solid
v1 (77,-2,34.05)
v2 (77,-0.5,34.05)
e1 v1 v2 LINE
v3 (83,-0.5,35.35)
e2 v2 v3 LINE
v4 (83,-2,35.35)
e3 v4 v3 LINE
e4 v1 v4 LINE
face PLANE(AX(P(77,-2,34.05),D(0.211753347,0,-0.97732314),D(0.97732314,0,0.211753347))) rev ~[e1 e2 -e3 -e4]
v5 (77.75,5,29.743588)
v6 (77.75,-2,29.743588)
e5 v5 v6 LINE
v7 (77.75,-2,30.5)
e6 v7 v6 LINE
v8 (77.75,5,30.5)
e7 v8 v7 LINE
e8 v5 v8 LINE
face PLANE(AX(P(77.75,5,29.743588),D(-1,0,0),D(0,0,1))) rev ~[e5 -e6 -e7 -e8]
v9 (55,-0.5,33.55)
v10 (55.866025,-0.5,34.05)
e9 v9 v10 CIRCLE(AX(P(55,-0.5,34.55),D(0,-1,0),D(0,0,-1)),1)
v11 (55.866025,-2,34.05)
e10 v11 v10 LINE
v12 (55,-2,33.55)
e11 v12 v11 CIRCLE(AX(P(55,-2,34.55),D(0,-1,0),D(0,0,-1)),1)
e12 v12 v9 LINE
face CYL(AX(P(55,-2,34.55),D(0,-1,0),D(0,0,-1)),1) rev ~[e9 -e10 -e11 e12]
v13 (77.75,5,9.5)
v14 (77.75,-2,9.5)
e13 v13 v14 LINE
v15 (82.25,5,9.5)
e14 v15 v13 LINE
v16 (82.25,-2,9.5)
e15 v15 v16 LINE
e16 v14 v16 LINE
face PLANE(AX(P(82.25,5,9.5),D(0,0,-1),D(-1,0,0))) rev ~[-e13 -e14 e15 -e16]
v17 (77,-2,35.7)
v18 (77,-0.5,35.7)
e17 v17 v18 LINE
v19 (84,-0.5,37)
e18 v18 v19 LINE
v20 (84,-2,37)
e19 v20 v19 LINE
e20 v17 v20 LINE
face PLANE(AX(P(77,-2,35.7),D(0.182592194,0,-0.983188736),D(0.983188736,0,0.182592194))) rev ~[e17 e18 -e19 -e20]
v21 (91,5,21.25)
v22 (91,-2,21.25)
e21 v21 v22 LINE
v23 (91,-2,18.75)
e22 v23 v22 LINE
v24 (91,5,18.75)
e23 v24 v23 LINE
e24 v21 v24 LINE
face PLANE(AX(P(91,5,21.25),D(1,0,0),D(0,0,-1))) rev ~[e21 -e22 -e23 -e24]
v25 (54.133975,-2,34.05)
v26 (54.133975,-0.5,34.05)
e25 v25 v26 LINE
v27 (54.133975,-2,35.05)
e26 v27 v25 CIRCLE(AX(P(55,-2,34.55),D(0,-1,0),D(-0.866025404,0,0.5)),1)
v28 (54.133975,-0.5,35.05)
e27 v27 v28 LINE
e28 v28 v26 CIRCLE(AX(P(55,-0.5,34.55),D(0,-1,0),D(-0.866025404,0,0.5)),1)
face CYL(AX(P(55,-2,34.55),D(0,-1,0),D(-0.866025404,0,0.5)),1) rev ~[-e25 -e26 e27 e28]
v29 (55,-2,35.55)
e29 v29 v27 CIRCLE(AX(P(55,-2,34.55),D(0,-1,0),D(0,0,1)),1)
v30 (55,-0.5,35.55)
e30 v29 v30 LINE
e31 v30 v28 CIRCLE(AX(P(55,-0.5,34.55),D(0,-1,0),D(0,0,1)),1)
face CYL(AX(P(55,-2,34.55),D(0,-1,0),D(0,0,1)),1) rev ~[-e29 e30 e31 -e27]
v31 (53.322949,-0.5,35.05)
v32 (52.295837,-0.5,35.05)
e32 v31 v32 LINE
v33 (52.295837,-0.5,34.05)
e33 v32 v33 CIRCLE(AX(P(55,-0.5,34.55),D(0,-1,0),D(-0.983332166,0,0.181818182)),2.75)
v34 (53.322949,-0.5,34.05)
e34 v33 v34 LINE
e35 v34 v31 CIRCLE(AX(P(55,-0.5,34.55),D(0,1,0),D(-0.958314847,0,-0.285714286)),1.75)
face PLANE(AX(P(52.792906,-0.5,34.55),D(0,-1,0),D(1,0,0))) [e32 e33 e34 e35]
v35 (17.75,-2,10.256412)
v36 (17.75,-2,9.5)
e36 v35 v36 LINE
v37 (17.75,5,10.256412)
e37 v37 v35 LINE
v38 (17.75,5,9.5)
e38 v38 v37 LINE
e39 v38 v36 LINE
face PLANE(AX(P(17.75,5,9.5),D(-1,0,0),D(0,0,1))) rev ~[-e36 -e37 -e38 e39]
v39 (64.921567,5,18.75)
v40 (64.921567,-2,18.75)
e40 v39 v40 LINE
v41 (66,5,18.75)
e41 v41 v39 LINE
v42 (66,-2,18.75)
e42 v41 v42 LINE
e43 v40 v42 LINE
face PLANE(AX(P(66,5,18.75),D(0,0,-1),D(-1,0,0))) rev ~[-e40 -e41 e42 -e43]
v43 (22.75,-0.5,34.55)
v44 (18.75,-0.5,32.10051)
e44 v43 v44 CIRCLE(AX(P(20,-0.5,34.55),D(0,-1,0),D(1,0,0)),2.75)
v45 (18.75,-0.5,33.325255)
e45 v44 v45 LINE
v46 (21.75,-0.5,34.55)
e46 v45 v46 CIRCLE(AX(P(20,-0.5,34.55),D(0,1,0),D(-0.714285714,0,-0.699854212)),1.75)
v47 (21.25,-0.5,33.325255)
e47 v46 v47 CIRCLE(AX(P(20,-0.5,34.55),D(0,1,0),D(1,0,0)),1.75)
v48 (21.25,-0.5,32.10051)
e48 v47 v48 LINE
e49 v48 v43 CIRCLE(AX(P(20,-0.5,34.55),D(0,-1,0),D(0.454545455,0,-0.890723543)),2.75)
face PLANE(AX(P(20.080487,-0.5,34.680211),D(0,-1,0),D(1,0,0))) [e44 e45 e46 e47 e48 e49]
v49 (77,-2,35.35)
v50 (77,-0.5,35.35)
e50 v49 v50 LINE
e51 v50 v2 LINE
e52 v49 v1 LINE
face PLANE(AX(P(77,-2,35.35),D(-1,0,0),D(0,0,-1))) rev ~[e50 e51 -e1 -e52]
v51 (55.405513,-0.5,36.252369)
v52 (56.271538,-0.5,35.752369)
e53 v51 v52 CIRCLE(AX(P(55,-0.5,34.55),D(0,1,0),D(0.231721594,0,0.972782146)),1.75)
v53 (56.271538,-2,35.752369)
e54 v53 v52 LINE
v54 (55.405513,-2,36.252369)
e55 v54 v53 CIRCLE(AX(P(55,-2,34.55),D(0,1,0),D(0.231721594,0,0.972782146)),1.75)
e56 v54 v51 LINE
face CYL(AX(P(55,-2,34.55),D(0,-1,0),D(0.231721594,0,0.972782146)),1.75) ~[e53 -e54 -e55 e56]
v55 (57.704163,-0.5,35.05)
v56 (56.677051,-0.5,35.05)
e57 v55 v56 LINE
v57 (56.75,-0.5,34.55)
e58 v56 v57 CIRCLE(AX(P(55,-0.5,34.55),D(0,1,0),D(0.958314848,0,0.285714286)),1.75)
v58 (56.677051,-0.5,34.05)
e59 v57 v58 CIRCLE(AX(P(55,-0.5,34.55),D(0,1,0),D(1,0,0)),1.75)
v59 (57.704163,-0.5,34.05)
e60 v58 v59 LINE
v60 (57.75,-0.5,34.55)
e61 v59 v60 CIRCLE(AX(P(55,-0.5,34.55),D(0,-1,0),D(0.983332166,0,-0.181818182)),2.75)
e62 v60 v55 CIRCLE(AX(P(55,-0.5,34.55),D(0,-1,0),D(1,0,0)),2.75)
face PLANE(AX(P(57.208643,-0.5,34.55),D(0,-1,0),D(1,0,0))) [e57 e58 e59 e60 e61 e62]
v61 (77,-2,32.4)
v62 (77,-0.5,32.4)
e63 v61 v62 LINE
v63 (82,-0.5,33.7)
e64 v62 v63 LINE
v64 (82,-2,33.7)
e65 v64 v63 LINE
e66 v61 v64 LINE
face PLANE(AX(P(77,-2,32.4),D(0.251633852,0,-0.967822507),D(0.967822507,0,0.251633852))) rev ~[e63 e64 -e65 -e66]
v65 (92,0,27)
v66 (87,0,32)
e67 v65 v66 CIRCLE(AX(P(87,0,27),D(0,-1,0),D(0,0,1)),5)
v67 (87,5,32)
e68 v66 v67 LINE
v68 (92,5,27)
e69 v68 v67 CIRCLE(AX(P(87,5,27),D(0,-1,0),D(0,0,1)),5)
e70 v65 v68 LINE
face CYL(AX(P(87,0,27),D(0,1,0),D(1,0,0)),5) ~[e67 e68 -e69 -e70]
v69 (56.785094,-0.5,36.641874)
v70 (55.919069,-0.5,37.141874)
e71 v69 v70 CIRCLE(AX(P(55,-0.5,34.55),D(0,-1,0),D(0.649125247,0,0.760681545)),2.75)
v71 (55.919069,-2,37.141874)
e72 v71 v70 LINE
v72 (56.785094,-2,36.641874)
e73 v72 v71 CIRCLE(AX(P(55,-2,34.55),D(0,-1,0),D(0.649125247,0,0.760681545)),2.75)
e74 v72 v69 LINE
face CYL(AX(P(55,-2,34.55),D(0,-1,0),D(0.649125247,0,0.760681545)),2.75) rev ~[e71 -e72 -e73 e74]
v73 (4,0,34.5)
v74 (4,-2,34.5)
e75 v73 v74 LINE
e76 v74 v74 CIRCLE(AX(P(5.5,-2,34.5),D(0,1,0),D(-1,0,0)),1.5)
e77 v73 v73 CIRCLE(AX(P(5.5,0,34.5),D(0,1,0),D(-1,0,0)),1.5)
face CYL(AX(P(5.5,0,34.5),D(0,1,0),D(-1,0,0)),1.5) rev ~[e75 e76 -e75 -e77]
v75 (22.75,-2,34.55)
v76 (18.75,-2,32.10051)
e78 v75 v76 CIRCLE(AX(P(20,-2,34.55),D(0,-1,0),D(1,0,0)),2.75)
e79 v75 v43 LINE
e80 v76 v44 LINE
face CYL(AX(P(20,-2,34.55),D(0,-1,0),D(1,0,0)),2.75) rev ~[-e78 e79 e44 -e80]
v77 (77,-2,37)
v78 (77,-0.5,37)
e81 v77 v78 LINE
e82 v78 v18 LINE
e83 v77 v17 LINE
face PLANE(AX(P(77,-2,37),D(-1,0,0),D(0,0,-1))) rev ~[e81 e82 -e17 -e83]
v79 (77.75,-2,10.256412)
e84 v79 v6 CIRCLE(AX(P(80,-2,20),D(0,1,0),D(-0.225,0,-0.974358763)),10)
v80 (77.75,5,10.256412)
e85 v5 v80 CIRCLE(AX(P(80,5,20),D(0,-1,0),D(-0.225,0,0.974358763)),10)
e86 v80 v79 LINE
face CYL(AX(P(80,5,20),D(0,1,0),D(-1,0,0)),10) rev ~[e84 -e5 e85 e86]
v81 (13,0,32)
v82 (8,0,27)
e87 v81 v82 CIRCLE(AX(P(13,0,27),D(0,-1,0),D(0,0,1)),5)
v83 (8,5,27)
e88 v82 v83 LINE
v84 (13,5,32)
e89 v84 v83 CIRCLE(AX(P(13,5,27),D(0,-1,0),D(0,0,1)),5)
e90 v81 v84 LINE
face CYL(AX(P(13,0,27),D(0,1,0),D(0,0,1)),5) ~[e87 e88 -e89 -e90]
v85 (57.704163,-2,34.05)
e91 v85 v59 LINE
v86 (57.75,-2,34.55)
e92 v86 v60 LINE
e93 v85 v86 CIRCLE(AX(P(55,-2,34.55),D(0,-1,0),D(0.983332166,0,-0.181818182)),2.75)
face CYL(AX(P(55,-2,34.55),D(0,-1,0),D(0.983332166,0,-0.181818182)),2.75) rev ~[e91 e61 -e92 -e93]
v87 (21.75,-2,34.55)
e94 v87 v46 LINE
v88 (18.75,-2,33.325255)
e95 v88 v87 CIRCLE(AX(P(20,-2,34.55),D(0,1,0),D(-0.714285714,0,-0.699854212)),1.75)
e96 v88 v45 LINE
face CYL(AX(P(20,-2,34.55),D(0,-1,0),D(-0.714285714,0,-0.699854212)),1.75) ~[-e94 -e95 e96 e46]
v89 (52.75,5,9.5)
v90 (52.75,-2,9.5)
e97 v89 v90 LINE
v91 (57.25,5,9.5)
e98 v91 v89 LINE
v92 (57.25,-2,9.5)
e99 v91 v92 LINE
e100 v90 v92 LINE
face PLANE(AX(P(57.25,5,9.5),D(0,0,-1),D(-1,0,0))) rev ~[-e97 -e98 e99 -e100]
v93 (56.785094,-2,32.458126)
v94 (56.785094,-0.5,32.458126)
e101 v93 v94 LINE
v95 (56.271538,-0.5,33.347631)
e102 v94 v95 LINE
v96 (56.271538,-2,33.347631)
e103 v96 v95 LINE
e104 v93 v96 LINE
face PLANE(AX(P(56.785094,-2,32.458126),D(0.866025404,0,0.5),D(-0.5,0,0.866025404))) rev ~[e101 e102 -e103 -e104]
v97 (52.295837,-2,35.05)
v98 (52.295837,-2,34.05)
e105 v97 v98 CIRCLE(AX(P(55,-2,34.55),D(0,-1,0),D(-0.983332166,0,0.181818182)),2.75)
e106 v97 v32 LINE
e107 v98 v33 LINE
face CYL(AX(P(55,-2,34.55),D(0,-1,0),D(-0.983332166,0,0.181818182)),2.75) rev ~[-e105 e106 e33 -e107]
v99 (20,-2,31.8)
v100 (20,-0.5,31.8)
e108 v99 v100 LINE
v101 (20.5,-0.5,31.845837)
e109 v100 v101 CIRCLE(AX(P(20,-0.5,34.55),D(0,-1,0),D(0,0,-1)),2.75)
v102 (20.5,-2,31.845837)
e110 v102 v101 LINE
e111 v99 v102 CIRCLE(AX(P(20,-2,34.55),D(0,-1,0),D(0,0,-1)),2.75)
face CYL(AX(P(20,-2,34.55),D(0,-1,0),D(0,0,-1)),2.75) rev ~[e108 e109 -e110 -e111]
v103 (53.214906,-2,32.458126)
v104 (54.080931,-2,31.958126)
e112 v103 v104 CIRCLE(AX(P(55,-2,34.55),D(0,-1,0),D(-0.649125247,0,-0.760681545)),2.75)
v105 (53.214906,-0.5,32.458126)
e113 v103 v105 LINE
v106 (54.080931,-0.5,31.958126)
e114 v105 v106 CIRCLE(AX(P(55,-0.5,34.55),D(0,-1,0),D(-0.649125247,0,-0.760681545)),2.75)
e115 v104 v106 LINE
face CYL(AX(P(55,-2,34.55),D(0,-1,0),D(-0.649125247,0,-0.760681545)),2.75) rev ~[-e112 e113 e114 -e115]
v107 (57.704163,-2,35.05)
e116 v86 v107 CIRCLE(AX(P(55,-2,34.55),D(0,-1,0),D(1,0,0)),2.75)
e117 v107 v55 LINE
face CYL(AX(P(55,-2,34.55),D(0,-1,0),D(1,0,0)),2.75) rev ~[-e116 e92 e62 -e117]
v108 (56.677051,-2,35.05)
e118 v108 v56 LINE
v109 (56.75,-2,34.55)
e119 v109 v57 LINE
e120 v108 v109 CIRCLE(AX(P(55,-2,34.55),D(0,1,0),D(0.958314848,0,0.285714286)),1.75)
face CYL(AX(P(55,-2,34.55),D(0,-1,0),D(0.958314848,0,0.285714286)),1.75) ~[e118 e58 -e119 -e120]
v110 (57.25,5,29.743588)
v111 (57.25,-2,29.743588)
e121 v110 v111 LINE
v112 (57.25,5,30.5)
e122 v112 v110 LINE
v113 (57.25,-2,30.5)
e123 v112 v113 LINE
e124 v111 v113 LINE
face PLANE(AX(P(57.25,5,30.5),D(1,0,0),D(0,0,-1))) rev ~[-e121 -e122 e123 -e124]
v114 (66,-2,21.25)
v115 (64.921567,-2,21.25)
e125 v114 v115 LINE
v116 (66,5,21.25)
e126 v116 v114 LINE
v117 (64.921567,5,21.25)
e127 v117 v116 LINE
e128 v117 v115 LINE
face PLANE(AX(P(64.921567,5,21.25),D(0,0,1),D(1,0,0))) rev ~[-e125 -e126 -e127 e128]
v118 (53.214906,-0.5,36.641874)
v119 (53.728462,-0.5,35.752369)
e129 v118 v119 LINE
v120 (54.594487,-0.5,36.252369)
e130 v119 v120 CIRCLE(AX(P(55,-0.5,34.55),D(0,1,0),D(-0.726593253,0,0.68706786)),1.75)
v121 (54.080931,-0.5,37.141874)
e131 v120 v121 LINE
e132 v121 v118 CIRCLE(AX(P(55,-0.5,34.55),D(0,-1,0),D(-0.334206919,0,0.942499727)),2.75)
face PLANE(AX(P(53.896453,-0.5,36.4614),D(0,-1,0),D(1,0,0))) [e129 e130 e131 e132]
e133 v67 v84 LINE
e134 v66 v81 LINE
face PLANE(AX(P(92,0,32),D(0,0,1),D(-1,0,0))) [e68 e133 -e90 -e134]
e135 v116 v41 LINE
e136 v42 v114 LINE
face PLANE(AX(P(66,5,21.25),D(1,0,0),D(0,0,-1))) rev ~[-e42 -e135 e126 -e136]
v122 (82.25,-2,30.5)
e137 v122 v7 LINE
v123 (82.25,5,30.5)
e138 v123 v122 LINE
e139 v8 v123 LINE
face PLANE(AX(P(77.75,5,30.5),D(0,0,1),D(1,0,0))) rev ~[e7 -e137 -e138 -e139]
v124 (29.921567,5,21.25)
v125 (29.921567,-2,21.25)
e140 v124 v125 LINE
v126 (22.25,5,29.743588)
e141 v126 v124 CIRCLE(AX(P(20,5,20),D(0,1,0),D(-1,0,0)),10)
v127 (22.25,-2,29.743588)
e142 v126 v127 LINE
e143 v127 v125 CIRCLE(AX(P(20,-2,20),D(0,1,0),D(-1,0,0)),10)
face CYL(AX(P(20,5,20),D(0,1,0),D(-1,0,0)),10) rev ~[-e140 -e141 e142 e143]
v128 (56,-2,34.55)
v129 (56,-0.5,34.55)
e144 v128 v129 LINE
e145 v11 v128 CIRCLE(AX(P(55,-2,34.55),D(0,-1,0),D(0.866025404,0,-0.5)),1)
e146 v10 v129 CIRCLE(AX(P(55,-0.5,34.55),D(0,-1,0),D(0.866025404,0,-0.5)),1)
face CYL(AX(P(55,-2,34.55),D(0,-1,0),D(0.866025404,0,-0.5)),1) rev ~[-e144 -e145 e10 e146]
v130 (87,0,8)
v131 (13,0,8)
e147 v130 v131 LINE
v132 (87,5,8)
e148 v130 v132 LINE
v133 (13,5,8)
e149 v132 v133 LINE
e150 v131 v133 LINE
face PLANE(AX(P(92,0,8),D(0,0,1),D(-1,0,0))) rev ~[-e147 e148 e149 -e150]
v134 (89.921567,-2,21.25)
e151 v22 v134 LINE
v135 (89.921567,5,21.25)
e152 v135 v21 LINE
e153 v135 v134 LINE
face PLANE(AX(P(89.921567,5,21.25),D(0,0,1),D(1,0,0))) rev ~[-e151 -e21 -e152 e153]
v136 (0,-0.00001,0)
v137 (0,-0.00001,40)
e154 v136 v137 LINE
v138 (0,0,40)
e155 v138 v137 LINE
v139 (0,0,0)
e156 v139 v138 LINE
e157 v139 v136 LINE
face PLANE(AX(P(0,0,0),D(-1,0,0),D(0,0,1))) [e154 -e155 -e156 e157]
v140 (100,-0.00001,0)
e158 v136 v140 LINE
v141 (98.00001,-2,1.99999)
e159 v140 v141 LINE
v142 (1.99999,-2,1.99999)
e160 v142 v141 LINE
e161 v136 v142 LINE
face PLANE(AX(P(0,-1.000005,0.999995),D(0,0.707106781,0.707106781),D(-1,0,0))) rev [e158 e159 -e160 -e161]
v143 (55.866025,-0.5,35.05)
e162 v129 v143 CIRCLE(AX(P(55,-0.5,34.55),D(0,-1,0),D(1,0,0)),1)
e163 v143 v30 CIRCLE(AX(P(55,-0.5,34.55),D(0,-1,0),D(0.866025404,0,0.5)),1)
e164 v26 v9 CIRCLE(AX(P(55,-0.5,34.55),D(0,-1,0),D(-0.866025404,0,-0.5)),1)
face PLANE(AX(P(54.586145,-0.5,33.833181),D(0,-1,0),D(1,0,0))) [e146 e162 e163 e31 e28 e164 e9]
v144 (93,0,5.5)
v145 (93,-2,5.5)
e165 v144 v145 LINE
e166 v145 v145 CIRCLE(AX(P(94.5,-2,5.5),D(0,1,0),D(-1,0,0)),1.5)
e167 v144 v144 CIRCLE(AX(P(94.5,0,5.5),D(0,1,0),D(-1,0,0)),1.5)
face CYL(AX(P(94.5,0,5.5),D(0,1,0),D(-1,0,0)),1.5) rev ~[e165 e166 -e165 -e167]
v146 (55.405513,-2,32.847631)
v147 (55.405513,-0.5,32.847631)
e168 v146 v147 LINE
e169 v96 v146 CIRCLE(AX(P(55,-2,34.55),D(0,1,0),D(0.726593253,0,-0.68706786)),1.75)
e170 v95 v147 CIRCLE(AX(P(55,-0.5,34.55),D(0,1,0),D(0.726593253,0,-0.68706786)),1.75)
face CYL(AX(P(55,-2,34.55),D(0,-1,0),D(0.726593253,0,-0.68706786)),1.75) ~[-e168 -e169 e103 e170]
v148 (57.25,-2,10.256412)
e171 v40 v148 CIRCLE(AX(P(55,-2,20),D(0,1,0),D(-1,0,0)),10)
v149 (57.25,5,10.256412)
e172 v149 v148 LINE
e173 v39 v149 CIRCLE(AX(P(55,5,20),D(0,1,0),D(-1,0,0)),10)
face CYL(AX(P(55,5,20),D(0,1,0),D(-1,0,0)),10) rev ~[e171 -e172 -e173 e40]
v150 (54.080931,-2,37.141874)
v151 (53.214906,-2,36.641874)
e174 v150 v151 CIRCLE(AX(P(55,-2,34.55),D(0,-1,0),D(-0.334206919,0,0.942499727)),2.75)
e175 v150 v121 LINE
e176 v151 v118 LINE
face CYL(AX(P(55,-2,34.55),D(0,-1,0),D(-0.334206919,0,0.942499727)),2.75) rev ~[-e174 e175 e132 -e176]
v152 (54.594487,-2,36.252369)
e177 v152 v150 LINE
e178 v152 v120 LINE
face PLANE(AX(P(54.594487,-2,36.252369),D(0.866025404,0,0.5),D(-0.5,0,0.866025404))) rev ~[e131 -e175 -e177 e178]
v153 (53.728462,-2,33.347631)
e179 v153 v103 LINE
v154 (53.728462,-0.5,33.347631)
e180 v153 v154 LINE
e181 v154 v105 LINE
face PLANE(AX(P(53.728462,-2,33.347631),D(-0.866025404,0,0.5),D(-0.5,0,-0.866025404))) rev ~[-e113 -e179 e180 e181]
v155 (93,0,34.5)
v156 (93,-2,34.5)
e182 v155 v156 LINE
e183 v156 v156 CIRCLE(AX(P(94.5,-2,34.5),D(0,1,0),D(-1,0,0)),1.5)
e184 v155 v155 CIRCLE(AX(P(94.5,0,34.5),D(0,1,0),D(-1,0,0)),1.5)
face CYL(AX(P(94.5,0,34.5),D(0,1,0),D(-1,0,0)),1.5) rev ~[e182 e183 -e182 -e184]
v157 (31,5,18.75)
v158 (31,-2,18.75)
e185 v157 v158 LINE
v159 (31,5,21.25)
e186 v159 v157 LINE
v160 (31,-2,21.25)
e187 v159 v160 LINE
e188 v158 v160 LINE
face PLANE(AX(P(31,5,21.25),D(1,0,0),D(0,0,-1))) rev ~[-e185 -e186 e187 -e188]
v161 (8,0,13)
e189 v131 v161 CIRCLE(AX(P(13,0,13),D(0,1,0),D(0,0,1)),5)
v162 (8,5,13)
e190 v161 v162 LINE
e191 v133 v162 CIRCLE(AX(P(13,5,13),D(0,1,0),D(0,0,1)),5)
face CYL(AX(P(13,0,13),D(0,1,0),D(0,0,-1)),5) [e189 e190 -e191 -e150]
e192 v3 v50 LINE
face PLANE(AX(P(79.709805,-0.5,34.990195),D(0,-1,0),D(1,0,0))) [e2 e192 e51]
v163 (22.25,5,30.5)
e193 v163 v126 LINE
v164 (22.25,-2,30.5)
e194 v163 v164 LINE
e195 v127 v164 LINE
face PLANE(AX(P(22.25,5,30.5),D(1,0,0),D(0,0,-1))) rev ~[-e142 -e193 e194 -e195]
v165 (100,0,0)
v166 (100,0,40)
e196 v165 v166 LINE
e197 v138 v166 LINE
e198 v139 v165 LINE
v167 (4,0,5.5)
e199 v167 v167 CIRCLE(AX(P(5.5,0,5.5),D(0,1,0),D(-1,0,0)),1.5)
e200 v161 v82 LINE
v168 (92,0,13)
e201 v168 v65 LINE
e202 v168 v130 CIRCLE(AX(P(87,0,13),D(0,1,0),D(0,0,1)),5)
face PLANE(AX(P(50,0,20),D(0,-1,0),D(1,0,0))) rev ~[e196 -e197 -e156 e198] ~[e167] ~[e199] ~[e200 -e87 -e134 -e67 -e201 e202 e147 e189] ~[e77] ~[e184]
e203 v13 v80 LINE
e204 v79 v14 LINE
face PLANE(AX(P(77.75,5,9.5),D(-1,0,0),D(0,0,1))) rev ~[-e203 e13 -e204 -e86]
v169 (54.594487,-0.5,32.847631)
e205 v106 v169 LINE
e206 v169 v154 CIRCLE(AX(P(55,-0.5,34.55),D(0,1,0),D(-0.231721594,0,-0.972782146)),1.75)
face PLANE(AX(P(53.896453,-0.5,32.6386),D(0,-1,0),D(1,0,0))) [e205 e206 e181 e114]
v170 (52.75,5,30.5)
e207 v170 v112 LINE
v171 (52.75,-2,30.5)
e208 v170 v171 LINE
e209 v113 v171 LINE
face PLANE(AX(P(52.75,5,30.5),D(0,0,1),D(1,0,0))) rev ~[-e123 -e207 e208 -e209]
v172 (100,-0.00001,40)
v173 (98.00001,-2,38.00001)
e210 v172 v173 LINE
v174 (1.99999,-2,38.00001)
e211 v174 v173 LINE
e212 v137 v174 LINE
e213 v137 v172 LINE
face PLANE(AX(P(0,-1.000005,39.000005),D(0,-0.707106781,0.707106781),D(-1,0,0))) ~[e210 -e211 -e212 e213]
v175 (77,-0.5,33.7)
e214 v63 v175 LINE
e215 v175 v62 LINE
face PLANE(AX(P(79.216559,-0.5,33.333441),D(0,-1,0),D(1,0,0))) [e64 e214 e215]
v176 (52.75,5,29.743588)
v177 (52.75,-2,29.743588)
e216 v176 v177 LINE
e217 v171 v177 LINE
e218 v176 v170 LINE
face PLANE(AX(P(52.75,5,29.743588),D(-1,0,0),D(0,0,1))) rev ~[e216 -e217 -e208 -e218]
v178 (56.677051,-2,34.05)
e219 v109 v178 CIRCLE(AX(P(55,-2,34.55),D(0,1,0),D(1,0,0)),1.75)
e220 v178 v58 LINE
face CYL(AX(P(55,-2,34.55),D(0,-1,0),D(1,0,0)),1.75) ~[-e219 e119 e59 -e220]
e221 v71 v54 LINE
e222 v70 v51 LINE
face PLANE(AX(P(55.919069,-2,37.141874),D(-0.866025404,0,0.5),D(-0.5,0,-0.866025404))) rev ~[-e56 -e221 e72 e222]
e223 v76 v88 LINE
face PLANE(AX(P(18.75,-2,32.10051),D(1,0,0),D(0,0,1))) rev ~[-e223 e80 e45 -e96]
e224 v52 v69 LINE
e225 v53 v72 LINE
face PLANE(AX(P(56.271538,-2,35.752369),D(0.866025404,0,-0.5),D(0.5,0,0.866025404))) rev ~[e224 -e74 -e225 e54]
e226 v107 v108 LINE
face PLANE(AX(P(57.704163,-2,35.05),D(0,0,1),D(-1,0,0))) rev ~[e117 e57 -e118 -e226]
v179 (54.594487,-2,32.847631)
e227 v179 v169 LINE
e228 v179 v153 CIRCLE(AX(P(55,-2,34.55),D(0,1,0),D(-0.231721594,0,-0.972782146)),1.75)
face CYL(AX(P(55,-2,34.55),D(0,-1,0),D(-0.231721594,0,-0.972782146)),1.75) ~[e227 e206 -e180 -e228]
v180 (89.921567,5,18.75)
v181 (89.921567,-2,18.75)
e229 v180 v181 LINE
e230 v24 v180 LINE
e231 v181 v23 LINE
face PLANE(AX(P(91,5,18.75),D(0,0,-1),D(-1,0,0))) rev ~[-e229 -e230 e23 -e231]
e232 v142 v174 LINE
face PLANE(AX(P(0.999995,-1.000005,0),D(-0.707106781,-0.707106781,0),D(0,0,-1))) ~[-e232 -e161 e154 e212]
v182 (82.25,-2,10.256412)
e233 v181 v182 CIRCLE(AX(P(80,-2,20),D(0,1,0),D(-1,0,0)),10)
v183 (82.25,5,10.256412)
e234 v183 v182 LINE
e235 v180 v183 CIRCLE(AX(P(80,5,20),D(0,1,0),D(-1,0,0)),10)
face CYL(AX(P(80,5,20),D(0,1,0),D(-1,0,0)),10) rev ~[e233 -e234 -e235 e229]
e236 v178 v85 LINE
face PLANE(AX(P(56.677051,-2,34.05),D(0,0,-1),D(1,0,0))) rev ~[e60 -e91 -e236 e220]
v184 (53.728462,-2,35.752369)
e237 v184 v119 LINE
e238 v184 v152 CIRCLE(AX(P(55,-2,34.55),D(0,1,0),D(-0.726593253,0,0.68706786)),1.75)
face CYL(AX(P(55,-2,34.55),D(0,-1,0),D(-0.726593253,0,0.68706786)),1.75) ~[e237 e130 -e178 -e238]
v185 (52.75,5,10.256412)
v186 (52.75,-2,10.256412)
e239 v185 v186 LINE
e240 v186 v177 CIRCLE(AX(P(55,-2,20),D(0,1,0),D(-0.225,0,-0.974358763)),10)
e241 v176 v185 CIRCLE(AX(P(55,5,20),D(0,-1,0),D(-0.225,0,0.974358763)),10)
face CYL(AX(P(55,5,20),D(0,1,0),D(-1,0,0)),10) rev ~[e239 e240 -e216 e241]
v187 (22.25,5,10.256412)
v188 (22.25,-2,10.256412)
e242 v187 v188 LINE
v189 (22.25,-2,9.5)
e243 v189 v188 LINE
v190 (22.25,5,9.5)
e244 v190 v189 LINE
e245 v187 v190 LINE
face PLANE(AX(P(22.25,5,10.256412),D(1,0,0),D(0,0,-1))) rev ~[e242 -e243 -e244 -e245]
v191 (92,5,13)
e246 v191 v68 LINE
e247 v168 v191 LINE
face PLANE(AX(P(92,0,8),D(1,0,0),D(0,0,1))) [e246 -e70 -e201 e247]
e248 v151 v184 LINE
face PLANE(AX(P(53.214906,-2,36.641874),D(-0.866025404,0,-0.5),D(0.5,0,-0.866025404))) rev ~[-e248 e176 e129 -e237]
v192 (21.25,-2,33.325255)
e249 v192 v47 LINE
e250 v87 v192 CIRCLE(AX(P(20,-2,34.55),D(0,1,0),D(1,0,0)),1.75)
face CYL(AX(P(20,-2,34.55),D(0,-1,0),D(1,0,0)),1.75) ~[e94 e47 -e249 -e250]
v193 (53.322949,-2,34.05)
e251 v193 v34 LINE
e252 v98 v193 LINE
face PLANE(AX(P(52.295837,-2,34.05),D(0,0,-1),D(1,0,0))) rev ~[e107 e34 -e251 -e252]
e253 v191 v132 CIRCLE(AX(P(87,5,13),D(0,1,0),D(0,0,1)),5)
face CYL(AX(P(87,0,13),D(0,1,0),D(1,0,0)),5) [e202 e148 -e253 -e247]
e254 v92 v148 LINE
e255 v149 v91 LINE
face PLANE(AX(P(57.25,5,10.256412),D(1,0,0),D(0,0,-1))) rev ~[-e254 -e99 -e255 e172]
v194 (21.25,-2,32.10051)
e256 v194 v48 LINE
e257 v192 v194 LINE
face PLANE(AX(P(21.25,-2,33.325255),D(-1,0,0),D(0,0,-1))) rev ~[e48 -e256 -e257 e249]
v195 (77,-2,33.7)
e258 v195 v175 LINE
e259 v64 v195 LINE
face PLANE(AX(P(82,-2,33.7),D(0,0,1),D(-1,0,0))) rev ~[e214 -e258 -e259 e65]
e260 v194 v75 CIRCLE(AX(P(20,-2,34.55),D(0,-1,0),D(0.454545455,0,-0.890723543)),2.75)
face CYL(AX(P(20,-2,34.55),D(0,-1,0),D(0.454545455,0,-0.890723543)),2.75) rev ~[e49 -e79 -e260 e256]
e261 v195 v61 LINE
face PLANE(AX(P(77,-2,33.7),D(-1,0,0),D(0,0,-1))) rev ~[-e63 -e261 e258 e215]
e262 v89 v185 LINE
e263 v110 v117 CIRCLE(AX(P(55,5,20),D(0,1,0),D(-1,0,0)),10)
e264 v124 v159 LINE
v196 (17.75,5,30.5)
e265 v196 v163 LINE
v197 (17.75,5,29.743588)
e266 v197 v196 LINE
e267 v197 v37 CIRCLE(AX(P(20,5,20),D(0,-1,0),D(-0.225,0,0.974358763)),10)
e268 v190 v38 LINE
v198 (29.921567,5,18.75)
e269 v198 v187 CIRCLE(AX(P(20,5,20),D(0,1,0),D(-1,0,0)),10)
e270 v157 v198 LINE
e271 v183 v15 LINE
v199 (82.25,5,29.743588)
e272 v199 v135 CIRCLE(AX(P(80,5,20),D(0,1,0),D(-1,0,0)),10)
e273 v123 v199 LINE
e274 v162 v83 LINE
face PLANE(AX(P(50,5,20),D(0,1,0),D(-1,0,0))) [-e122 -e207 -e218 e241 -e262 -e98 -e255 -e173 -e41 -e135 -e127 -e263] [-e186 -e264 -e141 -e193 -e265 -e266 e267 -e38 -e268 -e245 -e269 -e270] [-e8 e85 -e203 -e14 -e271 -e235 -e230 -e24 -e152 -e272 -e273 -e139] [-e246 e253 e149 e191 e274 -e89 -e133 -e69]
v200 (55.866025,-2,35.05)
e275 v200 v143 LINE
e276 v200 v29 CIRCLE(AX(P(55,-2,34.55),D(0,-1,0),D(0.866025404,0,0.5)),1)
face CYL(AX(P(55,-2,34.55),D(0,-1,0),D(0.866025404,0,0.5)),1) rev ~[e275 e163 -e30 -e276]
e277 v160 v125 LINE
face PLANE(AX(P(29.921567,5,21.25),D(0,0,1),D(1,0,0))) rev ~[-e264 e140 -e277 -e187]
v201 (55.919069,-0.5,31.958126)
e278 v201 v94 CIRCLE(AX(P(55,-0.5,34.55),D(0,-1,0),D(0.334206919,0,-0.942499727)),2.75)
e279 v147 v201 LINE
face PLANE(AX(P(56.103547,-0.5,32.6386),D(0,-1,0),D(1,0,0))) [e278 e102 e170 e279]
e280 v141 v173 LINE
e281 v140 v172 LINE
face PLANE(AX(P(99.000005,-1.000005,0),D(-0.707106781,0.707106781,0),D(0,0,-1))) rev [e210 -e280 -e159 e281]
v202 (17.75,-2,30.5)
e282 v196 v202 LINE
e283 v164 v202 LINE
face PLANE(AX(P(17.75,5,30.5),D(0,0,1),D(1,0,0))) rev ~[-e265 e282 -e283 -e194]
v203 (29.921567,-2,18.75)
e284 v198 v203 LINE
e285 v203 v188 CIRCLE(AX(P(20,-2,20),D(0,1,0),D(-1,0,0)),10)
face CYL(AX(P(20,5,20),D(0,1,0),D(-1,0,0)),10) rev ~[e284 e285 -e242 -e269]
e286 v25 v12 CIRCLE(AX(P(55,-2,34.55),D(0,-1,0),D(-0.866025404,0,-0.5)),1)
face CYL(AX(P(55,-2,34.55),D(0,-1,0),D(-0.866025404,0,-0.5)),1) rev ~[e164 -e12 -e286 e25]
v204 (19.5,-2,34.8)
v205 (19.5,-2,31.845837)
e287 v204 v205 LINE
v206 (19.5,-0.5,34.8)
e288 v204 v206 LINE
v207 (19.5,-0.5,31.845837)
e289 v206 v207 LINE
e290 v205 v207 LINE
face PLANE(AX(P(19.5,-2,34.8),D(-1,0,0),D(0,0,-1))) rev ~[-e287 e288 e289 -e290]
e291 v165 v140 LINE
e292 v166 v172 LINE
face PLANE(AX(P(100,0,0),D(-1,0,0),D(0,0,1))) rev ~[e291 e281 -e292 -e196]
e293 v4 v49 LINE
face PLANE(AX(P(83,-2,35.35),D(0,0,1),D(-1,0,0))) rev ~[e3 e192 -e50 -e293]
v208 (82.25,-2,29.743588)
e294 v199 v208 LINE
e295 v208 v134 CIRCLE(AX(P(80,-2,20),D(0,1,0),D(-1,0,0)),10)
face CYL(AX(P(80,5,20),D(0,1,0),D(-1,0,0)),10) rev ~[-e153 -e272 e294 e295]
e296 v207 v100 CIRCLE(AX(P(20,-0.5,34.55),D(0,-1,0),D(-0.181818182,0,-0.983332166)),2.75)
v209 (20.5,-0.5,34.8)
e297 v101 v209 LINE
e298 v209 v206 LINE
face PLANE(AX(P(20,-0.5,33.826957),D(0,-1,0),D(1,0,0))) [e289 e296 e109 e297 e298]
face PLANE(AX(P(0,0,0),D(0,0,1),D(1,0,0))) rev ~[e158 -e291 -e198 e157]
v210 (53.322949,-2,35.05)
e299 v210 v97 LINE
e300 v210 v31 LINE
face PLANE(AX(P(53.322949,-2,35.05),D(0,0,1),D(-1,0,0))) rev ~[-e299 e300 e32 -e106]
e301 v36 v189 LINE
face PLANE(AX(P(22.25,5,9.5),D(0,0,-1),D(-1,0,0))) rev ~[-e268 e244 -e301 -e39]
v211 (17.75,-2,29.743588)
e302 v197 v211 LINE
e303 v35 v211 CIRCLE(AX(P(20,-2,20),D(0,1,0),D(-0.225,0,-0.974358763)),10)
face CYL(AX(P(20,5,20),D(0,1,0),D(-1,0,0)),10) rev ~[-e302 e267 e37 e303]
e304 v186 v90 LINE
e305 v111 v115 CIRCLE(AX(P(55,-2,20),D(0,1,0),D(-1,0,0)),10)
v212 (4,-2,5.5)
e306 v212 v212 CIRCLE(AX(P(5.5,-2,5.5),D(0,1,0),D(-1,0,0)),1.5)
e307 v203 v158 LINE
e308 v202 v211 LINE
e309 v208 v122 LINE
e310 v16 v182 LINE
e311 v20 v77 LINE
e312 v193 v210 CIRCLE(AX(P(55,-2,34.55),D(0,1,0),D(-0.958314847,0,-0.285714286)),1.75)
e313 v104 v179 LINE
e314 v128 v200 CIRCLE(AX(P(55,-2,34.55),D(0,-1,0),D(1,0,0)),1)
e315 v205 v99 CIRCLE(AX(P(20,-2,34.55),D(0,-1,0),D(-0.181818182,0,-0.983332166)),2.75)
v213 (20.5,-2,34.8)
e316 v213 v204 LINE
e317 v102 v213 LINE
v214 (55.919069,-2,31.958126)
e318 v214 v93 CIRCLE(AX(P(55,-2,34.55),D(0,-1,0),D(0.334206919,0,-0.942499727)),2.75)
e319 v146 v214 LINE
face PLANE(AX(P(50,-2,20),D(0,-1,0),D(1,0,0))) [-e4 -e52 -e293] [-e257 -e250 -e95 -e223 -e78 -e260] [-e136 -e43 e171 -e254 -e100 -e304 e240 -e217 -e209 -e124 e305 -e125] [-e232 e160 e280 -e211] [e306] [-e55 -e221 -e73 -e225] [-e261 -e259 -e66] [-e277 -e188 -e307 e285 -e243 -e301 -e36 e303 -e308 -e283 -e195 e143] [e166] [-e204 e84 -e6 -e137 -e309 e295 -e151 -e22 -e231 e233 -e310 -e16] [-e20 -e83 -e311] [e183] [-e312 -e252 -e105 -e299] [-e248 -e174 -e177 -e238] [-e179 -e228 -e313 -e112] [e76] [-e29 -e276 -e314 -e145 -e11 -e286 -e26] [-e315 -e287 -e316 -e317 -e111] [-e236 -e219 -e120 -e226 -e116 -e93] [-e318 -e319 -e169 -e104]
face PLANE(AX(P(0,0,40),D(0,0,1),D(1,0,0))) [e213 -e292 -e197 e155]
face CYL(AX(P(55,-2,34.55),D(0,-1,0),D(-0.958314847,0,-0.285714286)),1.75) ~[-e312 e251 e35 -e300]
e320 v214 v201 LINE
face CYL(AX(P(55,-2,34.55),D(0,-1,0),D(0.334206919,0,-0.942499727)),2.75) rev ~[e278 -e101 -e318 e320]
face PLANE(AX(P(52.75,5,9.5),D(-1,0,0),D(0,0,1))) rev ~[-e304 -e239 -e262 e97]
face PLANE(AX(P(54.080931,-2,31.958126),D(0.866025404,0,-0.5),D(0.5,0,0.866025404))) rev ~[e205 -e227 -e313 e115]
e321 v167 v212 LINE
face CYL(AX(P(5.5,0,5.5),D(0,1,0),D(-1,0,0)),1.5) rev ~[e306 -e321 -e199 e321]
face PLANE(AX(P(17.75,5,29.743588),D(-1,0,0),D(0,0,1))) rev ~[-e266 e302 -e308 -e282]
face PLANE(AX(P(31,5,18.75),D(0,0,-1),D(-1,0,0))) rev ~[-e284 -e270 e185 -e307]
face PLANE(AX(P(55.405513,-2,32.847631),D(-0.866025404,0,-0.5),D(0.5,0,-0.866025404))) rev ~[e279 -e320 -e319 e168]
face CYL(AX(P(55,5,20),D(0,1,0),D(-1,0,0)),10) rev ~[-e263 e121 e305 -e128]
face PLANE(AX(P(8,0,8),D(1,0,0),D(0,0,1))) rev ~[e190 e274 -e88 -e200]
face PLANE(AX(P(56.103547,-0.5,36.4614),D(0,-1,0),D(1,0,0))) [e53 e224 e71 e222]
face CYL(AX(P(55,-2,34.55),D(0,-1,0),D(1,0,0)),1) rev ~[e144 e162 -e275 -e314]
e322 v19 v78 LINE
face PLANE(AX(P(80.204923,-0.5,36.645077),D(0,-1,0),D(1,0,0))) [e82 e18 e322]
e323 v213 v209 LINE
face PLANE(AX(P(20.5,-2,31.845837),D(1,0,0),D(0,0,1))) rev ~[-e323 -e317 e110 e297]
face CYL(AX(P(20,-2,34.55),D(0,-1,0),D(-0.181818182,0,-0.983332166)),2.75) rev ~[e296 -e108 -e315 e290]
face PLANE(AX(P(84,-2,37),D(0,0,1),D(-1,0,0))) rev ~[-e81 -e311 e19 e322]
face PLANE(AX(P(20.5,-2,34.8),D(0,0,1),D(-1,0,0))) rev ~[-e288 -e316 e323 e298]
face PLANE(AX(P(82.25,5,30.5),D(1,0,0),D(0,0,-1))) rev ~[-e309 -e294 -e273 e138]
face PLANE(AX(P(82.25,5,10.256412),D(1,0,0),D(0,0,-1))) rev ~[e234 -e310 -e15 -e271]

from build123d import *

# Parameters (mm, degrees)
F0_W      = 100
F0_H      = 40
F1_DEPTH  = 2
F2_SIZE   = 1.99999
F3_W      = 84
F3_H      = 24
F4_DEPTH  = 5
F5_R      = 1.5
F6_DEPTH  = 2.001
F7_R      = 5
F8_R      = 10
F9_DEPTH  = 7.001
F11_DEPTH = 7.001
F13_DEPTH = 7.001
F15_DEPTH = 1.5
F17_DEPTH = 1.5
F19_DEPTH = 1.5


# Not quite as in the source:
# - a fillet or chamfer is up to 0.001 mm smaller than in the source, because OpenCascade refuses the exact size


with BuildPart() as f1:
    # F0 (on Front) → F1 (new body)
    with BuildSketch(Plane.XZ):
        with Locations((50, 20)):
            Rectangle(F0_W, F0_H)
    extrude(amount=F1_DEPTH)

    # F2 (size 2 in the source; OpenCascade refuses exactly that, so slightly less here)
    f2_edges = [f1.edges().sort_by_distance(p)[0] for p in [
        (100, -2, 20),
        (50, -2, 40),
        (50, -2, 0),
        (0, -2, 20),
    ]]
    chamfer(f2_edges, length=F2_SIZE)

    # F3 (on face) → F4 (join)
    with BuildSketch(Plane(origin=(0, 0, 0), x_dir=(-1, 0, 0), z_dir=(0, 1, 0))):
        with Locations((-50, 20)):
            Rectangle(F3_W, F3_H)
    extrude(amount=F4_DEPTH)

    # F5 (on face) → F6 (cut, through all)
    with BuildSketch(Plane(origin=(0, 0, 0), x_dir=(-1, 0, 0), z_dir=(0, 1, 0))):
        with Locations((-94.5, 34.5)):
            Circle(F5_R)
        with Locations((-94.5, 5.5)):
            Circle(F5_R)
        with Locations((-5.5, 34.5)):
            Circle(F5_R)
        with Locations((-5.5, 5.5)):
            Circle(F5_R)
    extrude(amount=-F6_DEPTH, mode=Mode.SUBTRACT)

    # F7
    f7_edges = [f1.edges().sort_by_distance(p)[0] for p in [
        (92, 2.5, 8),
        (92, 2.5, 32),
        (8, 2.5, 8),
        (8, 2.5, 32),
    ]]
    fillet(f7_edges, radius=F7_R)

    # F8 (on face) → F9 (cut, through all)
    with BuildSketch(Plane(origin=(0, 5, 0), x_dir=(-1, 0, 0), z_dir=(0, 1, 0))):
        with Locations((-80, 20)):
            Circle(F8_R)
        with Locations((-55, 20)):
            Circle(F8_R)
        with Locations((-20, 20)):
            Circle(F8_R)
    extrude(amount=-F9_DEPTH, mode=Mode.SUBTRACT)

    # F10 (on face) → F11 (cut, through all)
    with BuildSketch(Plane(origin=(0, 5, 0), x_dir=(-1, 0, 0), z_dir=(0, 1, 0))):
        with BuildLine():
            Line((-89.9215674165, 21.25), (-91, 21.25))
            Line((-91, 21.25), (-91, 18.75))
            Line((-91, 18.75), (-89.9215674165, 18.75))
            ThreePointArc((-89.9215674165, 18.75), (-90, 20), (-89.9215674165, 21.25))
        make_face()
        with BuildLine():
            Line((-64.9215674165, 21.25), (-66, 21.25))
            Line((-66, 21.25), (-66, 18.75))
            Line((-66, 18.75), (-64.9215674165, 18.75))
            ThreePointArc((-64.9215674165, 18.75), (-65, 20), (-64.9215674165, 21.25))
        make_face()
        with BuildLine():
            Line((-29.9215674165, 21.25), (-31, 21.25))
            Line((-31, 21.25), (-31, 18.75))
            Line((-31, 18.75), (-29.9215674165, 18.75))
            ThreePointArc((-29.9215674165, 18.75), (-30, 20), (-29.9215674165, 21.25))
        make_face()
    extrude(amount=-F11_DEPTH, mode=Mode.SUBTRACT)

    # F12 (on face) → F13 (cut, through all)
    with BuildSketch(Plane(origin=(0, 5, 0), x_dir=(-1, 0, 0), z_dir=(0, 1, 0))):
        with BuildLine():
            Line((-77.75, 30.5), (-82.25, 30.5))
            Line((-82.25, 30.5), (-82.25, 29.743587635))
            ThreePointArc((-82.25, 29.743587635), (-80, 30), (-77.75, 29.743587635))
            Line((-77.75, 29.743587635), (-77.75, 30.5))
        make_face()
        with BuildLine():
            ThreePointArc((-77.75, 10.256412365), (-80, 10), (-82.25, 10.256412365))
            Line((-82.25, 10.256412365), (-82.25, 9.5))
            Line((-82.25, 9.5), (-77.75, 9.5))
            Line((-77.75, 9.5), (-77.75, 10.256412365))
        make_face()
        with BuildLine():
            ThreePointArc((-52.75, 10.256412365), (-55, 10), (-57.25, 10.256412365))
            Line((-57.25, 10.256412365), (-57.25, 9.5))
            Line((-57.25, 9.5), (-52.75, 9.5))
            Line((-52.75, 9.5), (-52.75, 10.256412365))
        make_face()
        with BuildLine():
            Line((-52.75, 30.5), (-57.25, 30.5))
            Line((-57.25, 30.5), (-57.25, 29.743587635))
            ThreePointArc((-57.25, 29.743587635), (-55, 30), (-52.75, 29.743587635))
            Line((-52.75, 29.743587635), (-52.75, 30.5))
        make_face()
        with BuildLine():
            Line((-17.75, 30.5), (-22.25, 30.5))
            Line((-22.25, 30.5), (-22.25, 29.743587635))
            ThreePointArc((-22.25, 29.743587635), (-20, 30), (-17.75, 29.743587635))
            Line((-17.75, 29.743587635), (-17.75, 30.5))
        make_face()
        with BuildLine():
            ThreePointArc((-17.75, 10.256412365), (-20, 10), (-22.25, 10.256412365))
            Line((-22.25, 10.256412365), (-22.25, 9.5))
            Line((-22.25, 9.5), (-17.75, 9.5))
            Line((-17.75, 9.5), (-17.75, 10.256412365))
        make_face()
    extrude(amount=-F13_DEPTH, mode=Mode.SUBTRACT)

    # F14 (on face) → F15 (cut)
    with BuildSketch(Plane.XZ.offset(2)):
        with BuildLine():
            ThreePointArc((22.75, 34.55), (18.5638593384, 36.8952078799), (18.75, 32.1005102572))
            Line((18.75, 32.1005102572), (18.75, 33.3252551286))
            ThreePointArc((18.75, 33.3252551286), (19.3385621722, 36.1701851746), (21.75, 34.55))
            ThreePointArc((21.75, 34.55), (21.6201851746, 33.8885621722), (21.25, 33.3252551286))
            Line((21.25, 33.3252551286), (21.25, 32.1005102572))
            ThreePointArc((21.25, 32.1005102572), (22.3452078799, 33.1138593384), (22.75, 34.55))
        make_face()
        with BuildLine():
            Line((19.5, 34.8), (19.5, 32.8729490169))
            ThreePointArc((19.5, 32.8729490169), (20, 32.8), (20.5, 32.8729490169))
            Line((20.5, 32.8729490169), (20.5, 34.8))
            Line((20.5, 34.8), (19.5, 34.8))
        make_face()
        with BuildLine():
            ThreePointArc((19.5, 31.8458365434), (19.7489517035, 31.8114831107), (20, 31.8))
            ThreePointArc((20, 31.8), (20.2510482965, 31.8114831107), (20.5, 31.8458365434))
            Line((20.5, 31.8458365434), (20.5, 32.8729490169))
            ThreePointArc((20.5, 32.8729490169), (20, 32.8), (19.5, 32.8729490169))
            Line((19.5, 32.8729490169), (19.5, 31.8458365434))
        make_face()
    extrude(amount=-F15_DEPTH, mode=Mode.SUBTRACT)

    # F16 (on face) → F17 (cut)
    with BuildSketch(Plane.XZ.offset(2)):
        with BuildLine():
            ThreePointArc((54.1339745962, 34.05), (54.5, 33.6839745962), (55, 33.55))
            Line((55, 33.55), (54.7113248654, 34.05))
            Line((54.7113248654, 34.05), (54.1339745962, 34.05))
        make_face()
        Polygon((54.4226497308, 34.55), (54.1339745962, 34.05), (54.7113248654, 34.05), align=None)
        with BuildLine():
            Line((54.4226497308, 34.55), (54.1339745962, 35.05))
            ThreePointArc((54.1339745962, 35.05), (54, 34.55), (54.1339745962, 34.05))
            Line((54.1339745962, 34.05), (54.4226497308, 34.55))
        make_face()
        Polygon((54.7113248654, 35.05), (54.1339745962, 35.05), (54.4226497308, 34.55), align=None)
        with BuildLine():
            Line((54.7113248654, 35.05), (55, 35.55))
            ThreePointArc((55, 35.55), (54.5, 35.4160254038), (54.1339745962, 35.05))
            Line((54.1339745962, 35.05), (54.7113248654, 35.05))
        make_face()
        Polygon((55.2886751346, 35.05), (55, 35.55), (54.7113248654, 35.05), align=None)
        Polygon((55.5773502692, 34.55), (55.2886751346, 35.05), (54.7113248654, 35.05), (54.4226497308, 34.55), (54.7113248654, 34.05), (55.2886751346, 34.05), align=None)
        Polygon((54.7113248654, 34.05), (55, 33.55), (55.2886751346, 34.05), align=None)
        with BuildLine():
            ThreePointArc((55, 33.55), (55.5, 33.6839745962), (55.8660254038, 34.05))
            Line((55.8660254038, 34.05), (55.2886751346, 34.05))
            Line((55.2886751346, 34.05), (55, 33.55))
        make_face()
        with BuildLine():
            ThreePointArc((56, 34.55), (55.9659258263, 34.8088190451), (55.8660254038, 35.05))
            Line((55.8660254038, 35.05), (55.5773502692, 34.55))
            Line((55.5773502692, 34.55), (55.8660254038, 34.05))
            ThreePointArc((55.8660254038, 34.05), (55.9659258263, 34.2911809549), (56, 34.55))
        make_face()
        Polygon((55.5773502692, 34.55), (55.8660254038, 35.05), (55.2886751346, 35.05), align=None)
        with BuildLine():
            Line((55.2886751346, 35.05), (55.8660254038, 35.05))
            ThreePointArc((55.8660254038, 35.05), (55.5, 35.4160254038), (55, 35.55))
            Line((55, 35.55), (55.2886751346, 35.05))
        make_face()
        Polygon((55.2886751346, 34.05), (55.8660254038, 34.05), (55.5773502692, 34.55), align=None)
        with BuildLine():
            ThreePointArc((53.2149055698, 32.4581257506), (53.625, 32.1684301396), (54.0809309736, 31.9581257506))
            Line((54.0809309736, 31.9581257506), (54.5944872103, 32.8476312452))
            ThreePointArc((54.5944872103, 32.8476312452), (54.125, 33.0344555434), (53.7284618065, 33.3476312452))
            Line((53.7284618065, 33.3476312452), (53.2149055698, 32.4581257506))
        make_face()
        with BuildLine():
            ThreePointArc((55.9190690264, 31.9581257506), (56.375, 32.1684301396), (56.7850944302, 32.4581257506))
            Line((56.7850944302, 32.4581257506), (56.2715381935, 33.3476312452))
            ThreePointArc((56.2715381935, 33.3476312452), (55.875, 33.0344555434), (55.4055127897, 32.8476312452))
            Line((55.4055127897, 32.8476312452), (55.9190690264, 31.9581257506))
        make_face()
        with BuildLine():
            ThreePointArc((57.7041634566, 34.05), (57.7385168893, 34.2989517035), (57.75, 34.55))
            ThreePointArc((57.75, 34.55), (57.7385168893, 34.8010482965), (57.7041634566, 35.05))
            Line((57.7041634566, 35.05), (56.6770509831, 35.05))
            ThreePointArc((56.6770509831, 35.05), (56.7316667145, 34.8026467688), (56.75, 34.55))
            ThreePointArc((56.75, 34.55), (56.7316667145, 34.2973532312), (56.6770509831, 34.05))
            Line((56.6770509831, 34.05), (57.7041634566, 34.05))
        make_face()
        with BuildLine():
            Line((56.2715381935, 35.7523687548), (56.7850944302, 36.6418742494))
            ThreePointArc((56.7850944302, 36.6418742494), (56.375, 36.9315698604), (55.9190690264, 37.1418742494))
            Line((55.9190690264, 37.1418742494), (55.4055127897, 36.2523687548))
            ThreePointArc((55.4055127897, 36.2523687548), (55.875, 36.0655444566), (56.2715381935, 35.7523687548))
        make_face()
        with BuildLine():
            Line((54.5944872103, 36.2523687548), (54.0809309736, 37.1418742494))
            ThreePointArc((54.0809309736, 37.1418742494), (53.625, 36.9315698604), (53.2149055698, 36.6418742494))
            Line((53.2149055698, 36.6418742494), (53.7284618065, 35.7523687548))
            ThreePointArc((53.7284618065, 35.7523687548), (54.125, 36.0655444566), (54.5944872103, 36.2523687548))
        make_face()
        with BuildLine():
            Line((53.3229490169, 35.05), (52.2958365434, 35.05))
            ThreePointArc((52.2958365434, 35.05), (52.25, 34.55), (52.2958365434, 34.05))
            Line((52.2958365434, 34.05), (53.3229490169, 34.05))
            ThreePointArc((53.3229490169, 34.05), (53.25, 34.55), (53.3229490169, 35.05))
        make_face()
    extrude(amount=-F17_DEPTH, mode=Mode.SUBTRACT)

    # F18 (on face) → F19 (cut)
    with BuildSketch(Plane.XZ.offset(2)):
        Polygon((77, 35.7), (84, 37), (77, 37), align=None)
        Polygon((83, 35.35), (77, 35.35), (77, 34.05), align=None)
        Polygon((77, 32.4), (82, 33.7), (77, 33.7), align=None)
    extrude(amount=-F19_DEPTH, mode=Mode.SUBTRACT)


solid = f1.part
